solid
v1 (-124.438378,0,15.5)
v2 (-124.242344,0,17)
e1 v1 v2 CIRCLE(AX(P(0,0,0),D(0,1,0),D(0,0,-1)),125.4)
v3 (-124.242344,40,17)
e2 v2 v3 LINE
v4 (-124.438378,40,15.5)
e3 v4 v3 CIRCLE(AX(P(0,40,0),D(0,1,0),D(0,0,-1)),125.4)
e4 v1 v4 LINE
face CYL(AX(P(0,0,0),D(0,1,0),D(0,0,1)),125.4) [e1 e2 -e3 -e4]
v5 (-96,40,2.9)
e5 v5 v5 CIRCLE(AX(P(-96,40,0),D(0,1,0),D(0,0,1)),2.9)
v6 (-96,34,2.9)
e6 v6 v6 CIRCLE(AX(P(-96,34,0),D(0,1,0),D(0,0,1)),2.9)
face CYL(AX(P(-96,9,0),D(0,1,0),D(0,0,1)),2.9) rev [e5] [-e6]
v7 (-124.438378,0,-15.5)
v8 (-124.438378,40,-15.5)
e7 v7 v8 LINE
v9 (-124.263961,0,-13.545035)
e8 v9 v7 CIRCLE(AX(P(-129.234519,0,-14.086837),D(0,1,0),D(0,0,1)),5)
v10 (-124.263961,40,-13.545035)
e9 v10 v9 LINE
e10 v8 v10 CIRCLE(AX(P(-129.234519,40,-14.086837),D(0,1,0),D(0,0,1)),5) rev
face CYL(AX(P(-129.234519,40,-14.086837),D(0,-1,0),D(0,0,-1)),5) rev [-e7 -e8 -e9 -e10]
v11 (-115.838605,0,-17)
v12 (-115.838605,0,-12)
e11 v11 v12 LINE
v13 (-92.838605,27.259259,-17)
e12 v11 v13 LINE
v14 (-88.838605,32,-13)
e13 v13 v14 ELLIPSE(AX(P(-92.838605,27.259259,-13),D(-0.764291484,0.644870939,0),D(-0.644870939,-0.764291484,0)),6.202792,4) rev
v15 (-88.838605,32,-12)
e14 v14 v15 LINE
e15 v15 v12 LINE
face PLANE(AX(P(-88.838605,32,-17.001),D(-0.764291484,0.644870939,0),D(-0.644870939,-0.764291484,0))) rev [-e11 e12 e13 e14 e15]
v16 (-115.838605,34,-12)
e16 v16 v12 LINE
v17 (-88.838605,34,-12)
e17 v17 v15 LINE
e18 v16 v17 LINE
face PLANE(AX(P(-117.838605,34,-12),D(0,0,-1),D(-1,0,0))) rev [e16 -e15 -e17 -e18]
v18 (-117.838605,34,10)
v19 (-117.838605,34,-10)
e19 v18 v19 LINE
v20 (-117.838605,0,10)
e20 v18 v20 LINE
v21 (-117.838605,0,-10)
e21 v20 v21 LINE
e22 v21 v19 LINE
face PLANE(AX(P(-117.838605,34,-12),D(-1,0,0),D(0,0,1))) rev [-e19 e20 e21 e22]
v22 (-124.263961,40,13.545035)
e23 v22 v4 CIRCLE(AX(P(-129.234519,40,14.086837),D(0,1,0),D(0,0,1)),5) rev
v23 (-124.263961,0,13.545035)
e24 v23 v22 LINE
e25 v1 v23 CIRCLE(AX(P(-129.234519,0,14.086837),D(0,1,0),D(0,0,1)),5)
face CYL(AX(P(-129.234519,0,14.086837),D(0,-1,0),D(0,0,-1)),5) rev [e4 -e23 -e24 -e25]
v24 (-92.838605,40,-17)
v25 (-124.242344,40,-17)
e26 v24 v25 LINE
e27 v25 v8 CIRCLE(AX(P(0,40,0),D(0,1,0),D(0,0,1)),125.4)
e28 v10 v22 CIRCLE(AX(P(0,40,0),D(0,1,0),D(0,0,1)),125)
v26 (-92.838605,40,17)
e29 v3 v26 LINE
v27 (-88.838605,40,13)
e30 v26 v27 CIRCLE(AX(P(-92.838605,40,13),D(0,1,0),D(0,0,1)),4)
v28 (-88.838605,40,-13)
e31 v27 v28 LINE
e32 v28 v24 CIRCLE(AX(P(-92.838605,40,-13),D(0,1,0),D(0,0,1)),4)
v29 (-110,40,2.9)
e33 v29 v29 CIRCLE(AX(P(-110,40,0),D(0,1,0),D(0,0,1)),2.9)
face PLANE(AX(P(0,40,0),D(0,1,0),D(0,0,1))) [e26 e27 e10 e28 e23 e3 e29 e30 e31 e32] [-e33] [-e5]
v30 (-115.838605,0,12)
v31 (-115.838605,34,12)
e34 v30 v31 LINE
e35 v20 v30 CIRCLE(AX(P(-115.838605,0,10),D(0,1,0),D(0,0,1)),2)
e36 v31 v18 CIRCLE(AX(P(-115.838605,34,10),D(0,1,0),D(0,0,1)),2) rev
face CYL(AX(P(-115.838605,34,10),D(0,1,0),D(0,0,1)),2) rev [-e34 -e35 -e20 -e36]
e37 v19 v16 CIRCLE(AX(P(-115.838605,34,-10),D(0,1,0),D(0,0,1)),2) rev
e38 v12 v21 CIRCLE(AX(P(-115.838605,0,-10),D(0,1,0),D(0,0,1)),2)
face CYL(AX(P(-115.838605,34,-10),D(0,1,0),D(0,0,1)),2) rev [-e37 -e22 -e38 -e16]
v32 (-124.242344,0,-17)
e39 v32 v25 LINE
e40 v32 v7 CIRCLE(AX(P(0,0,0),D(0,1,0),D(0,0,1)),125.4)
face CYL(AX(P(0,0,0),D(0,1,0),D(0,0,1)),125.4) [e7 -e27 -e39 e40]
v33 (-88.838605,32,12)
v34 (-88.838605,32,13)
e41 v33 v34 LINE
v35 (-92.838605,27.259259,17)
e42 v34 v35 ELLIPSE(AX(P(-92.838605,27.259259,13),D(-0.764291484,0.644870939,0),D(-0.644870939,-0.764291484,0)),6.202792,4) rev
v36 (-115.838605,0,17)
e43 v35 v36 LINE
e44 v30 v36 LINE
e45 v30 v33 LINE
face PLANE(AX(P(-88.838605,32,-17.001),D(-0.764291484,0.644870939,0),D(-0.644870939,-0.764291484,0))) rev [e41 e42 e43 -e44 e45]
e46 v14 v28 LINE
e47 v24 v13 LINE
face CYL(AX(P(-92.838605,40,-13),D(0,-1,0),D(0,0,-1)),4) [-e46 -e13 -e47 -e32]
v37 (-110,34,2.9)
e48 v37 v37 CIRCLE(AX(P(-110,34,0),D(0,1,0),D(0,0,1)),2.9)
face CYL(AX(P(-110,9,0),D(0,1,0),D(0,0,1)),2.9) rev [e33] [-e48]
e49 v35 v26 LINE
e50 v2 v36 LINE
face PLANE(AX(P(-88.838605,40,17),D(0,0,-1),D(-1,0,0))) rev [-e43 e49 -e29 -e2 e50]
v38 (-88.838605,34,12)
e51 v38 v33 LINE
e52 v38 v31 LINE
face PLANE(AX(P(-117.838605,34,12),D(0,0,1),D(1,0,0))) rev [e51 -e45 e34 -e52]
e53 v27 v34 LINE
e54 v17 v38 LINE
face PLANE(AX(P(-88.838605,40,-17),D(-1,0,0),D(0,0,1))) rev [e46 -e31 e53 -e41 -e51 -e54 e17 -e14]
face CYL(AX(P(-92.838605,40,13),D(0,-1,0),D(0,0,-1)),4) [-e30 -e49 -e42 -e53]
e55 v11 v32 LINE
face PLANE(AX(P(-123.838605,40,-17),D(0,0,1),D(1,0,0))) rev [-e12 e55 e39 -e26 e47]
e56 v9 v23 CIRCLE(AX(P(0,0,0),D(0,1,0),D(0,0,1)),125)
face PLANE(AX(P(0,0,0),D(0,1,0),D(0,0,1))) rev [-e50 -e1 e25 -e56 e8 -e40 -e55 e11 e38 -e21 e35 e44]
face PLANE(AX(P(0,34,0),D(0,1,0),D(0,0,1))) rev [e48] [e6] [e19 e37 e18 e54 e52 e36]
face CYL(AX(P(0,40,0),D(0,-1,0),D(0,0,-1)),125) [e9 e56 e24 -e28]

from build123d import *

# Parameters (mm, degrees)
BOSS_EXTRUDE1_DEPTH = 40
CUT_EXTRUDE1_REACH  = 137.577
SKETCH3_W           = 29
SKETCH3_H           = 24
CUT_EXTRUDE2_DEPTH  = 34
SKETCH6_R           = 2.9
CUT_EXTRUDE3_DEPTH  = 31
FILLET2_R           = 4
BOSS_EXTRUDE3_START = -40
BOSS_EXTRUDE3_DEPTH = 40
FILLET4_R           = 5
FILLET5_R           = 2


with BuildPart() as part:
    # Sketch1 → Boss-Extrude1 (new body)
    with BuildSketch(Plane(origin=(0, 0, 0), x_dir=(1, 0, 0), z_dir=(0, 1, 0))):
        with BuildLine():
            Line((-123.838604643, 17), (-88.838604643, 17))
            Line((-88.838604643, 17), (-88.838604643, -17))
            Line((-88.838604643, -17), (-123.838604643, -17))
            ThreePointArc((-123.838604643, -17), (-125, 0), (-123.838604643, 17))
        make_face()
    extrude(amount=BOSS_EXTRUDE1_DEPTH)

    # Sketch2 → Cut-Extrude1 (cut, up to next)
    with BuildSketch(Plane.XY.offset(17), mode=Mode.PRIVATE) as cut_extrude1_sk1:
        Polygon((-88.838604643, 0), (-88.838604643, 32), (-115.838604643, 0), align=None)
    cut_extrude1_tool1 = extrude(cut_extrude1_sk1.sketch, amount=-CUT_EXTRUDE1_REACH, mode=Mode.PRIVATE) & part.part
    add(cut_extrude1_tool1.solids().sort_by_distance((-97.838605, 10.666667, 17))[0], mode=Mode.SUBTRACT)

    # Sketch3 → Cut-Extrude2 (cut)
    with BuildSketch(Plane.XZ):
        with Locations((-103.338604643, 0)):
            Rectangle(SKETCH3_W, SKETCH3_H)
    extrude(amount=-CUT_EXTRUDE2_DEPTH, mode=Mode.SUBTRACT)

    # Sketch6 → Cut-Extrude3 (cut)
    with BuildSketch(Plane(origin=(0, 40, 0), x_dir=(1, 0, 0), z_dir=(0, 1, 0))):
        with Locations(Location((-110, 0, 0), (0, 0, 270))):
            Circle(SKETCH6_R)
        with Locations(Location((-96, 0, 0), (0, 0, 270))):
            Circle(SKETCH6_R)
    extrude(amount=-CUT_EXTRUDE3_DEPTH, mode=Mode.SUBTRACT)

    # Fillet2
    fillet2_edges = [part.edges().sort_by_distance(p)[0] for p in [
        (-88.838604643, 36, -17),
        (-88.838604643, 36, 17),
    ]]
    fillet(fillet2_edges, radius=FILLET2_R)

    # Sketch8 → Boss-Extrude3 (add)
    with BuildSketch(Plane(origin=(0, 40, 0), x_dir=(1, 0, 0), z_dir=(0, 1, 0)).offset(BOSS_EXTRUDE3_START)):
        with BuildLine():
            Line((-123.838604643, 17), (-124.242343829, 17))
            ThreePointArc((-124.242343829, 17), (-124.342622992, 16.250295609), (-124.438378324, 15.5))
            Line((-124.438378324, 15.5), (-124.03527724, 15.5))
            ThreePointArc((-124.03527724, 15.5), (-123.93921022, 16.250297537), (-123.838604643, 17))
        make_face()
        with BuildLine():
            Line((-124.438378324, -15.5), (-124.03527724, -15.5))
            ThreePointArc((-124.03527724, -15.5), (-123.93921022, -16.250297537), (-123.838604643, -17))
            Line((-123.838604643, -17), (-124.242343829, -17))
            ThreePointArc((-124.242343829, -17), (-124.342622992, -16.250295609), (-124.438378324, -15.5))
        make_face()
    extrude(amount=BOSS_EXTRUDE3_DEPTH)

    # Fillet4
    # the kernel refuses this fillet: 5 mm, written as the material it adds along each edge
    with BuildSketch(Plane(origin=(-124.03527724, 0, 15.5), x_dir=(-0.11618374288163974, 0, -0.9932277371731083), z_dir=(0, 1, 0))) as fillet4_piece_1:
        with BuildLine():
            CenterArc((2.007660221, 4.99984503), FILLET4_R, 246.910702944, 22.638192563)
            Line((0.046833793, 0.400371178), (0.007617264, 0.308381701))
            ThreePointArc((0.007617264, 0.308381701), (-0.075905877, 0.211803963), (-0.099322774, 0.011618374))
            Line((-0.099322774, 0.011618374), (0.000787318, -0.099996901))
            ThreePointArc((0.000787318, -0.099996901), (0.984147167, -0.096125757), (1.967507016, -0.099996901))
            Line((1.967507016, -0.099996901), (1.968294334, 0))
        make_face()
    extrude(amount=40)
    with BuildSketch(Plane(origin=(-124.03527724, 0, -15.5), x_dir=(-1, 0, 0), z_dir=(0, 1, 0))) as fillet4_piece_2:
        with BuildLine():
            CenterArc((5.199242245, 1.413163109), FILLET4_R, 173.779198266, 22.638192563)
            Line((0.228683803, 1.954964528), (0.129272634, 1.965800556))
            ThreePointArc((0.129272634, 1.965800556), (0.018867133, 0.988650514), (-0.099228222, 0.0124))
            Line((-0.099228222, 0.0124), (0, -0.1))
            ThreePointArc((0, -0.1), (0.201550542, -0.1), (0.307178261, -0.028263262))
            Line((0.307178261, -0.028263262), (0.403101084, 0))
        make_face()
    extrude(amount=40)

    # Fillet5
    fillet5_edges = [part.edges().sort_by_distance(p)[0] for p in [
        (-117.838604643, 17, 12),
        (-117.838604643, 17, -12),
    ]]
    fillet(fillet5_edges, radius=FILLET5_R)


solid = part.part
